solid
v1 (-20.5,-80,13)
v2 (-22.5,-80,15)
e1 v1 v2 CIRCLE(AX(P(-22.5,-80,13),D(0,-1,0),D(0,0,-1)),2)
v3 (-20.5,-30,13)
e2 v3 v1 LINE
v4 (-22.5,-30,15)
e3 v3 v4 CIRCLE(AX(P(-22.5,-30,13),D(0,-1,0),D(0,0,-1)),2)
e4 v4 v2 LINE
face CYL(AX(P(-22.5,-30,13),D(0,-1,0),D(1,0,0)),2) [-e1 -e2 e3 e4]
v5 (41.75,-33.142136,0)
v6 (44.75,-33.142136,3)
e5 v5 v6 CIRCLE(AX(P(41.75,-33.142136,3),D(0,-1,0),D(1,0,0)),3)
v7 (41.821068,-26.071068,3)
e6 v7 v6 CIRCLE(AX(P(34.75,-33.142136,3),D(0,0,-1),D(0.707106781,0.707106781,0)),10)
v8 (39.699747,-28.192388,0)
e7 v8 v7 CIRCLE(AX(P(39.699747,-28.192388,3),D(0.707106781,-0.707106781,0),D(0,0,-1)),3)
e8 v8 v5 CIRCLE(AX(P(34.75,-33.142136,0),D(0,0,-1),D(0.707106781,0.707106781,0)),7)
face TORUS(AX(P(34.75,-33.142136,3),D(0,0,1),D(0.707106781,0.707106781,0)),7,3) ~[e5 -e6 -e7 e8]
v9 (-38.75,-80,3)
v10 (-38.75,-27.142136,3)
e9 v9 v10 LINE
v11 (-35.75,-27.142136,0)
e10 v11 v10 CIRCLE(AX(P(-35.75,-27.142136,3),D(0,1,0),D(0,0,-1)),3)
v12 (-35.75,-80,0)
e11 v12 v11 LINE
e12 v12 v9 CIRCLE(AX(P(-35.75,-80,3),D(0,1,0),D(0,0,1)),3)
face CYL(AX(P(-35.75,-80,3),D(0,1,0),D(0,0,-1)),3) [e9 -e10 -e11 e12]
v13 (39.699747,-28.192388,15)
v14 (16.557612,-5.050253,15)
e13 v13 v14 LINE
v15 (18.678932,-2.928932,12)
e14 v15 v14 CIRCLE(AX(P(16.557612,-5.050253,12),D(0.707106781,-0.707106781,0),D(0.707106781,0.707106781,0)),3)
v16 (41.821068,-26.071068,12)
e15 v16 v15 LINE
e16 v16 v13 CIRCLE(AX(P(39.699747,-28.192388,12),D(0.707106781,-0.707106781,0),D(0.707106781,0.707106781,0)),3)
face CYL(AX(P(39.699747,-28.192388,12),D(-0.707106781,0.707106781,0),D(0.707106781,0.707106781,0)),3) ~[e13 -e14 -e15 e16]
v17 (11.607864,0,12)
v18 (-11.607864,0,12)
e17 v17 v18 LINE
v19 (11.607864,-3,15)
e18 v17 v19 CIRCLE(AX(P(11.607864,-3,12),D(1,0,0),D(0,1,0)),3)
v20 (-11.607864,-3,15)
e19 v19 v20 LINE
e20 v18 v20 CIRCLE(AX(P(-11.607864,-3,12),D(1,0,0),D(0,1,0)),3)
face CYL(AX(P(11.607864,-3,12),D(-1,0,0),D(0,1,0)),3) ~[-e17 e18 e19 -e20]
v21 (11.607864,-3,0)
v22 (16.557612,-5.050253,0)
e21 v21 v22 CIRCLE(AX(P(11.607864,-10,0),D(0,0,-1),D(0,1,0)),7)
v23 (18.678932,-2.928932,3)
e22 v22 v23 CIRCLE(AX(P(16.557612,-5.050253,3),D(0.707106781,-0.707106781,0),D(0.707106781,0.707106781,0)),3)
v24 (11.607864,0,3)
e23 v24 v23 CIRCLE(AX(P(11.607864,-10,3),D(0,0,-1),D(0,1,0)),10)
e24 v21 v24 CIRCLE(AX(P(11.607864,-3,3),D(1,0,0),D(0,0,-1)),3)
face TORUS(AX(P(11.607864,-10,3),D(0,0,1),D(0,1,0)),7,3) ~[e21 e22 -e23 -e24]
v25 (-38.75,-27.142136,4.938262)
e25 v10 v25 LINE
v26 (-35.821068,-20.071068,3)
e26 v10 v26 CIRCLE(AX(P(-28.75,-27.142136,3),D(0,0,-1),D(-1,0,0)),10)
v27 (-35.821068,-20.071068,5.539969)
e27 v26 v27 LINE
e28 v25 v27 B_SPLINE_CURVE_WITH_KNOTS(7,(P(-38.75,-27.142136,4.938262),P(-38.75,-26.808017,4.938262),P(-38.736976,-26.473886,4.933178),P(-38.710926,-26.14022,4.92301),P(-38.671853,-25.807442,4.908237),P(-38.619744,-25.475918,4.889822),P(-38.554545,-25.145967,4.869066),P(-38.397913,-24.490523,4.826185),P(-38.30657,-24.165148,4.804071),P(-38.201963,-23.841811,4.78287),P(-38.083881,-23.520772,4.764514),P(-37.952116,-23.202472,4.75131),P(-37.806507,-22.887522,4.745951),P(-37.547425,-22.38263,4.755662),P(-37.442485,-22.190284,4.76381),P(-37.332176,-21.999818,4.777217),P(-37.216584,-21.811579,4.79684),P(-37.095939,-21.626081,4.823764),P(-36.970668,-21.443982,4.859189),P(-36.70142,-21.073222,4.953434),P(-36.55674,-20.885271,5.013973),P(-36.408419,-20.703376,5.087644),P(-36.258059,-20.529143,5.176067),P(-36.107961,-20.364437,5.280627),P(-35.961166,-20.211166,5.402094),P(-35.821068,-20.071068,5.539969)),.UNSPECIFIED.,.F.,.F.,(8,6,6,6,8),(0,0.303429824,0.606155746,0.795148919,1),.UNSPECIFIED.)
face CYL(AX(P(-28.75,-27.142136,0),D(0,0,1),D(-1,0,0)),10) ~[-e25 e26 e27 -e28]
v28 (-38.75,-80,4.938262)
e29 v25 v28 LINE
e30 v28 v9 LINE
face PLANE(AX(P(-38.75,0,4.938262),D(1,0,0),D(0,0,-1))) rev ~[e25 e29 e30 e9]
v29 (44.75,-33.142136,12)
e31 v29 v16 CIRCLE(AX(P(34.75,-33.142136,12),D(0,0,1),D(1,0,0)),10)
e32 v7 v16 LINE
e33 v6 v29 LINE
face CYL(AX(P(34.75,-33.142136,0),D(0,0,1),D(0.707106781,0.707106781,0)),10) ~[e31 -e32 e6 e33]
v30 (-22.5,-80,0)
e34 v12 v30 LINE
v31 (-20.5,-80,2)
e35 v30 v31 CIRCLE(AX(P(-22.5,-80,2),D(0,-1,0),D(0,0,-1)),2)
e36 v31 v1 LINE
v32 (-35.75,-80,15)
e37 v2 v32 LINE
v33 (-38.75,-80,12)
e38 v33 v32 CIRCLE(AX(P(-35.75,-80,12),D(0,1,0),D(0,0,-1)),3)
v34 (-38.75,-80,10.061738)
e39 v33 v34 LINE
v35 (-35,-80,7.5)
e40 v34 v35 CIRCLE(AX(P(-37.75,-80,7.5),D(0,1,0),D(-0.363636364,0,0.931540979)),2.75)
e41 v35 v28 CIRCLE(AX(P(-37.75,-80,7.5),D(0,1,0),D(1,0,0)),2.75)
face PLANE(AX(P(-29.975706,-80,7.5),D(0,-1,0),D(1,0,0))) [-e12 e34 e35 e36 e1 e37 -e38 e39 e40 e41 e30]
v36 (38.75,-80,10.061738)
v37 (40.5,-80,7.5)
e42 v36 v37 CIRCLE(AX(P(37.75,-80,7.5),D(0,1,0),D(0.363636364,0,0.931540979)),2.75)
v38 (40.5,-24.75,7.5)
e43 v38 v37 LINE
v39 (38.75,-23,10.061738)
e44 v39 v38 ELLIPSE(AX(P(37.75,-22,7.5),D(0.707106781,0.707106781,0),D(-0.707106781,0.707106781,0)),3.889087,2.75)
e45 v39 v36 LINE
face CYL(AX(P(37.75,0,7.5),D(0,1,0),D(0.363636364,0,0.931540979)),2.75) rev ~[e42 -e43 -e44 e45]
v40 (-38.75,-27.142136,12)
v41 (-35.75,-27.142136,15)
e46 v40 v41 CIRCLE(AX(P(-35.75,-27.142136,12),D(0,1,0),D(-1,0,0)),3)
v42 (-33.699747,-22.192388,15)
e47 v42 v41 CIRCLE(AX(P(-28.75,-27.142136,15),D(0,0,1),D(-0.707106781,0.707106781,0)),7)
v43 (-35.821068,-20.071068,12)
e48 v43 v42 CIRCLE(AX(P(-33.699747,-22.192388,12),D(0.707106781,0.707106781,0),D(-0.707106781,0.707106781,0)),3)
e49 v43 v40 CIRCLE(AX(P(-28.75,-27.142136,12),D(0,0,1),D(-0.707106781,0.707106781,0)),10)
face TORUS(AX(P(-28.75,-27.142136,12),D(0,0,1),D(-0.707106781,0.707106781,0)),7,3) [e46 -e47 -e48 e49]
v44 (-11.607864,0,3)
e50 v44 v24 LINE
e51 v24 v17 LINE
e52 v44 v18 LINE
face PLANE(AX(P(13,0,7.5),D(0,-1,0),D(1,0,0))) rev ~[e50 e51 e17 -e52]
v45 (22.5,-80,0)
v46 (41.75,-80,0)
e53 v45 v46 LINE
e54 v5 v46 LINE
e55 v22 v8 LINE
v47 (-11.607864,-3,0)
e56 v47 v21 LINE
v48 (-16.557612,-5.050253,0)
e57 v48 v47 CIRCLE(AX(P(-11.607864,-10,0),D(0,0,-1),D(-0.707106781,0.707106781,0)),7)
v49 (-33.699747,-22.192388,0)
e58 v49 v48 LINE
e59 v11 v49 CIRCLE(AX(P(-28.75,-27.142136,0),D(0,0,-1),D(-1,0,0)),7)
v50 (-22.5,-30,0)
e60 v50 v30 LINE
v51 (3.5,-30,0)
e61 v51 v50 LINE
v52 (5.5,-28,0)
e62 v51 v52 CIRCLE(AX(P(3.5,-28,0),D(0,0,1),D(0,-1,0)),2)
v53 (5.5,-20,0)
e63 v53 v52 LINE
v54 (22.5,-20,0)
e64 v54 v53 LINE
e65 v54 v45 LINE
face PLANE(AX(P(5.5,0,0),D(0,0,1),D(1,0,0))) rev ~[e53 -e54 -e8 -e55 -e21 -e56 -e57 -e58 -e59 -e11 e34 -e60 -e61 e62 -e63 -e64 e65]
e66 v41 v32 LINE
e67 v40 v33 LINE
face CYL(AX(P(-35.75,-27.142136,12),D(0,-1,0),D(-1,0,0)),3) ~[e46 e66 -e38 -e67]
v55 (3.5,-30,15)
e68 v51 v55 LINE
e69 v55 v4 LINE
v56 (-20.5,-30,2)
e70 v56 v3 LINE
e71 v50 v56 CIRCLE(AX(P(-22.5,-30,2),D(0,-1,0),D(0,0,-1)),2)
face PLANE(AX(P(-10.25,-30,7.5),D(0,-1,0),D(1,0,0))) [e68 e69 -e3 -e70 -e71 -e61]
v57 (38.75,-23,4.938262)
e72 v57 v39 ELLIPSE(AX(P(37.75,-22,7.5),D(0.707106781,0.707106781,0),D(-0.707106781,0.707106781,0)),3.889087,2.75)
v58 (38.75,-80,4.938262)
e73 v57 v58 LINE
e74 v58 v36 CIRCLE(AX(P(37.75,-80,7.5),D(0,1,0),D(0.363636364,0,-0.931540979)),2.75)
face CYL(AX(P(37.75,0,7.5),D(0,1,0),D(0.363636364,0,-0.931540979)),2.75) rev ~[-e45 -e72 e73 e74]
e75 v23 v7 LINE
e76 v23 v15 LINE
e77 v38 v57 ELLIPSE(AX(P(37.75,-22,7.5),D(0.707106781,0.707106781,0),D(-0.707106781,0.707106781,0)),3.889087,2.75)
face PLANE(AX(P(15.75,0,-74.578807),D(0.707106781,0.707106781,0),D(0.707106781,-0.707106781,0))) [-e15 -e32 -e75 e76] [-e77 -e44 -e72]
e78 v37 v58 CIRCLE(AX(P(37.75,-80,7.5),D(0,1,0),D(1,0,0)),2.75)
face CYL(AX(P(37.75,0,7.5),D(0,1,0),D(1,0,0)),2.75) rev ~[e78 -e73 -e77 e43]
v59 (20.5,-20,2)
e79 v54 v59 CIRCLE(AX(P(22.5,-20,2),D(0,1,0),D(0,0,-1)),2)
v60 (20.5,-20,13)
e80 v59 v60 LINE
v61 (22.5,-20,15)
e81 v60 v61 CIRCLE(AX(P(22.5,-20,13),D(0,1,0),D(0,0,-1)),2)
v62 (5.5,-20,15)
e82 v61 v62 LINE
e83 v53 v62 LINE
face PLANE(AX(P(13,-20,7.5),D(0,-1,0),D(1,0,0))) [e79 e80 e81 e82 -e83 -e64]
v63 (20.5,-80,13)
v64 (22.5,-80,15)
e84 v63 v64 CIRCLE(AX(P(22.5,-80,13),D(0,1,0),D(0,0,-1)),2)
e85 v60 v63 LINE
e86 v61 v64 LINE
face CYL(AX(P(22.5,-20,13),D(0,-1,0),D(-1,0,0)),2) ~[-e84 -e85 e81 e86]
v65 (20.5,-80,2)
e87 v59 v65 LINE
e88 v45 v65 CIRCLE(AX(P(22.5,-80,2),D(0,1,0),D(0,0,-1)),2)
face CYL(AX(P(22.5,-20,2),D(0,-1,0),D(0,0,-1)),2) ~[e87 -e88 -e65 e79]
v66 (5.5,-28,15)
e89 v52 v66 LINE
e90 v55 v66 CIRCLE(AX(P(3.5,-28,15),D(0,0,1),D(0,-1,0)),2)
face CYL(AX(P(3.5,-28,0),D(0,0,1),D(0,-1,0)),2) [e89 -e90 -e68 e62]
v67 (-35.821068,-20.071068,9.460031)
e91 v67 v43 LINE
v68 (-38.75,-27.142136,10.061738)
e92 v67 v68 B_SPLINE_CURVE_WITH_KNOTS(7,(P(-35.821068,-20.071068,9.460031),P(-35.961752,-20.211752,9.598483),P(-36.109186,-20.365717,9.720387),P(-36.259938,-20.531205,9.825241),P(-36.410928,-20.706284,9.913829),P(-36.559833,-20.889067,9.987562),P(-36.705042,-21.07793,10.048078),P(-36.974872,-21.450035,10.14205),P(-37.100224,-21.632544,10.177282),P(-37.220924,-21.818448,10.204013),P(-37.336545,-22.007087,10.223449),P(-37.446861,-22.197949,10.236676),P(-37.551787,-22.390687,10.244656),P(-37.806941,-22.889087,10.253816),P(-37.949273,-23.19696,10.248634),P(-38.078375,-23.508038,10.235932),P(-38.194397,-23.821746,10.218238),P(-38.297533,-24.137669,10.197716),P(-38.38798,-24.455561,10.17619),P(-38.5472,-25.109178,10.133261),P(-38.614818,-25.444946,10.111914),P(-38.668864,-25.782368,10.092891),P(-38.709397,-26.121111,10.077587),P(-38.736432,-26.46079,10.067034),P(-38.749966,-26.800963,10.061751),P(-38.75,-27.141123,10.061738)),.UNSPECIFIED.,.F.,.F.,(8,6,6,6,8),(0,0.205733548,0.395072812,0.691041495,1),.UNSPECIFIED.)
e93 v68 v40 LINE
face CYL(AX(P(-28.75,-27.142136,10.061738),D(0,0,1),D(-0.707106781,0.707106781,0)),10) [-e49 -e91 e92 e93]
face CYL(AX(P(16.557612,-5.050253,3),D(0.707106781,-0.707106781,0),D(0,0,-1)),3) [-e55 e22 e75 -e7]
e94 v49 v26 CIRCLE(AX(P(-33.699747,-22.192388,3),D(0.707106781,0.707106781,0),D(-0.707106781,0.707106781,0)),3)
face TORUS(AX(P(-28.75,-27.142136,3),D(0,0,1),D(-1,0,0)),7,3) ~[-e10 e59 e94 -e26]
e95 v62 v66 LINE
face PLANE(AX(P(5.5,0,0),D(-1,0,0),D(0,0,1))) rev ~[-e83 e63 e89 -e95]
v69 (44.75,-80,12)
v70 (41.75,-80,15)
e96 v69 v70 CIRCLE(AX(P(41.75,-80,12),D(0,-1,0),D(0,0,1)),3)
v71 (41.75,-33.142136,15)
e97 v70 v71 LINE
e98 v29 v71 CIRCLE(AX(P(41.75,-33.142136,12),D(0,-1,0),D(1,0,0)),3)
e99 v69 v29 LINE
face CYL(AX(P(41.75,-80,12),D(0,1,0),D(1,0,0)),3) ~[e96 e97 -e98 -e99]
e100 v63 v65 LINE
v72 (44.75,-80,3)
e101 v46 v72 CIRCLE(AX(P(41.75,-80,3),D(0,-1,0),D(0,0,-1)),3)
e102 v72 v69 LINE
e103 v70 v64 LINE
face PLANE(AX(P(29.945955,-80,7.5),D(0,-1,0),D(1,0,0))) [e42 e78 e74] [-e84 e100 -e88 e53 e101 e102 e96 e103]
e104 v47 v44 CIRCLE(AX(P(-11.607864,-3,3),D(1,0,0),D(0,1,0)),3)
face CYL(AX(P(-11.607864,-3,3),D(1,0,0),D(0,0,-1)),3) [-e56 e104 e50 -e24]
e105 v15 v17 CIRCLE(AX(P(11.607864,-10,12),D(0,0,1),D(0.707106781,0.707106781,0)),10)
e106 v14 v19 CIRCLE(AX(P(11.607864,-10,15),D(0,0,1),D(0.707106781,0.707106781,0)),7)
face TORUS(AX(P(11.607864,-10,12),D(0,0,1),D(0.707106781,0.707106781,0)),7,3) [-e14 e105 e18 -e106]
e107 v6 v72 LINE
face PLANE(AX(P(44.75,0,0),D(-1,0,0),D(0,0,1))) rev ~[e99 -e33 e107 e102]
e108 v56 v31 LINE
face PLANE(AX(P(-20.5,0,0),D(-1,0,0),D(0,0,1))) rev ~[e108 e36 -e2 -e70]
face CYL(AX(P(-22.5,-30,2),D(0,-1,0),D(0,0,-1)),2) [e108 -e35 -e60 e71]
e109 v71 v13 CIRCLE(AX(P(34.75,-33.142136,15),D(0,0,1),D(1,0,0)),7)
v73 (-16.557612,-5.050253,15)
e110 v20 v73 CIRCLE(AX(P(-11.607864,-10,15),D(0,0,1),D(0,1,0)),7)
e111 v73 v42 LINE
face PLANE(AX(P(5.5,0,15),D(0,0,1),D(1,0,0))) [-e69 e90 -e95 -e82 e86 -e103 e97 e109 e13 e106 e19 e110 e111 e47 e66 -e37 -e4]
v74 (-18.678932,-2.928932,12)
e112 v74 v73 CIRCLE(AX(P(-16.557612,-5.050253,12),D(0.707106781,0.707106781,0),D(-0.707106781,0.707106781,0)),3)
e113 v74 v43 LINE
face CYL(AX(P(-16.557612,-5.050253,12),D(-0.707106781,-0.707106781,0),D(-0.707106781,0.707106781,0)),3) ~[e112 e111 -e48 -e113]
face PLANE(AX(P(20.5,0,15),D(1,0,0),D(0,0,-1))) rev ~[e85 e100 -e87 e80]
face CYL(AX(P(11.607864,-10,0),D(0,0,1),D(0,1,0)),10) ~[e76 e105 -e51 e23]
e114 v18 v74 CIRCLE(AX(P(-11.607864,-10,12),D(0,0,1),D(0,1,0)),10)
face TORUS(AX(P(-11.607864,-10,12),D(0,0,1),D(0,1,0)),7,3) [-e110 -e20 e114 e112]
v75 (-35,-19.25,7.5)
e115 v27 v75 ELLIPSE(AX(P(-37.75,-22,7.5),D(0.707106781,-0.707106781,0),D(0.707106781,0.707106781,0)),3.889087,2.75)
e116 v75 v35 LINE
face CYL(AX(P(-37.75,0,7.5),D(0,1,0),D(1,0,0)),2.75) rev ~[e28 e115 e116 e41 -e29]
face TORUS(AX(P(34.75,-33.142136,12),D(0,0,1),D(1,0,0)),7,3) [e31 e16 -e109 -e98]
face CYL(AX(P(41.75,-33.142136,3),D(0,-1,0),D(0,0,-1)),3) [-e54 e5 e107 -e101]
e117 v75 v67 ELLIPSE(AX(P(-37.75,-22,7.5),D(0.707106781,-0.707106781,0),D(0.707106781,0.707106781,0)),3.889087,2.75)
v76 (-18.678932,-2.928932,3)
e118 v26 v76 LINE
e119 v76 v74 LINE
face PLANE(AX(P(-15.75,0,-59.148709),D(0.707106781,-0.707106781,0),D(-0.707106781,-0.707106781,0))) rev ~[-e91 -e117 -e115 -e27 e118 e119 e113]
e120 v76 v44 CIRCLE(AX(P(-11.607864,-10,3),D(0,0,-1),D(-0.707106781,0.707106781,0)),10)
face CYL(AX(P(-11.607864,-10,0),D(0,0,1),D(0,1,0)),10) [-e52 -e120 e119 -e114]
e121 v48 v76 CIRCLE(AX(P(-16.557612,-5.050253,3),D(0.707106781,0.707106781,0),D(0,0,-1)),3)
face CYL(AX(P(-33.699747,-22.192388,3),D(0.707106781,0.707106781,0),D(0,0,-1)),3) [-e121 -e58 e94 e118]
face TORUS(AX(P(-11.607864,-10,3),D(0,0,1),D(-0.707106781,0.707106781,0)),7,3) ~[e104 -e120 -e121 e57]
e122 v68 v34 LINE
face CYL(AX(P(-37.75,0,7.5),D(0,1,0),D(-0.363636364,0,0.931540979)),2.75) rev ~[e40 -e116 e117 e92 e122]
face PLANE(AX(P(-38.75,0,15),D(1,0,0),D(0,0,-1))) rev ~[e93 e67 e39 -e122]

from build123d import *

# Parameters (mm, degrees)
F1_DEPTH    = 80
F0_W        = 20.5
F0_H        = 15
F0_W_2      = 5.5
F2_DEPTH    = 30
F0_W_3      = 15
F3_DEPTH    = 20
F4_T1_DEPTH = 123.2356797549
F4_T3_DEPTH = 123.2356797549
F5_T1_DEPTH = 164.157613302
F6_R        = 10
F7_R        = 2
F8_R        = 3


# Not quite as in the source:
# - a fillet or chamfer that OpenCascade refuses, or shapes differently, is made with other operations: its cross-section is extruded or revolved along the edge and cut away or added


with BuildPart() as f1:
    # F0 (on Front) → F1 (new body)
    with BuildSketch(Plane.XZ):
        with BuildLine():
            Line((-20.5, 15), (-38.75, 15))
            Line((-38.75, 15), (-38.75, 10.0617376915))
            ThreePointArc((-38.75, 10.0617376915), (-36.1987907943, 9.7707377656), (-35, 7.5))
            ThreePointArc((-35, 7.5), (-36.1987907943, 5.2292622344), (-38.75, 4.9382623085))
            Line((-38.75, 4.9382623085), (-38.75, 0))
            Line((-38.75, 0), (-20.5, 0))
            Line((-20.5, 0), (-20.5, 15))
        make_face()
    extrude(amount=F1_DEPTH)

    # F0 (on Front) → F2 (join)
    with BuildSketch(Plane.XZ):
        with Locations((-10.25, 7.5)):
            Rectangle(F0_W, F0_H)
        with Locations((2.75, 7.5)):
            Rectangle(F0_W_2, F0_H)
    extrude(amount=F2_DEPTH)



with BuildPart() as f1b:
    # F0 (on Front) → F1, piece 2 (new body)
    with BuildSketch(Plane.XZ):
        with BuildLine():
            Line((38.75, 15), (20.5, 15))
            Line((20.5, 15), (20.5, 0))
            Line((20.5, 0), (38.75, 0))
            Line((38.75, 0), (38.75, 4.9382623085))
            ThreePointArc((38.75, 4.9382623085), (35, 7.5), (38.75, 10.0617376915))
            Line((38.75, 10.0617376915), (38.75, 15))
        make_face()
        with BuildLine():
            Line((44.75, 15), (38.75, 15))
            Line((38.75, 15), (38.75, 10.0617376915))
            ThreePointArc((38.75, 10.0617376915), (40.0207377656, 9.0512092057), (40.5, 7.5))
            ThreePointArc((40.5, 7.5), (40.0207377656, 5.9487907943), (38.75, 4.9382623085))
            Line((38.75, 4.9382623085), (38.75, 0))
            Line((38.75, 0), (44.75, 0))
            Line((44.75, 0), (44.75, 15))
        make_face()
    extrude(amount=F1_DEPTH)


with BuildPart() as f1_1:
    add(f1.part)

    add(f1b.part)  # F3 merges F1b
    # F0 (on Front) → F3 (join)
    with BuildSketch(Plane.XZ):
        with Locations((13, 7.5)):
            Rectangle(F0_W_3, F0_H)
    extrude(amount=F3_DEPTH)

    # F4: chamfer of 23 on 2 edges, made by hand

    # F4_s2 → F4_t1 (cut)
    with BuildSketch(Plane.XY.offset(-59.1487087232)):
        Polygon((-15.75, 0), (-38.75, -23), (-38.75, 0), align=None)
    extrude(amount=F4_T1_DEPTH, mode=Mode.SUBTRACT)

    # F4_s4 → F4_t3 (cut)
    with BuildSketch(Plane.XY.offset(-49.0869710317)):
        Polygon((-15.75, 0), (-38.75, -23), (-38.75, 0), align=None)
    extrude(amount=F4_T3_DEPTH, mode=Mode.SUBTRACT)

    # F5: chamfer of 29 on 1 edges, made by hand

    # F5_s2 → F5_t1 (cut)
    with BuildSketch(Plane.XY.offset(-74.578806651)):
        Polygon((15.75, 0), (44.75, -29), (44.75, 0), align=None)
    extrude(amount=F5_T1_DEPTH, mode=Mode.SUBTRACT)

    # F6
    f6_edges = [f1_1.edges().sort_by_distance(p)[0] for p in [
        (15.75, 0, 7.5),
        (-15.75, 0, 7.5),
        (44.75, -29, 7.5),
        (-38.75, -23, 2.469131),
        (-38.75, -23, 12.530869),
    ]]
    fillet(f6_edges, radius=F6_R)

    # F7
    f7_edges = [f1_1.edges().sort_by_distance(p)[0] for p in [
        (20.5, -50, 15),
        (20.5, -50, 0),
        (-20.5, -55, 15),
        (-20.5, -55, 0),
        (5.5, -30, 7.5),
    ]]
    fillet(f7_edges, radius=F7_R)

    # F8
    f8_edges = [f1_1.edges().sort_by_distance(p)[0] for p in [
        (-38.75, -53.571068, 15),
        (-37.988795, -23.315301, 15),
        (-27.25, -11.5, 15),
        (-15.434699, -0.761205, 15),
        (0, 0, 15),
        (15.434699, -0.761205, 15),
        (30.25, -14.5, 15),
        (43.988795, -29.315301, 15),
        (44.75, -56.571068, 15),
        (44.75, -56.571068, 0),
        (43.988795, -29.315301, 0),
        (-38.75, -53.571068, 0),
        (-37.988795, -23.315301, 0),
        (-27.25, -11.5, 0),
        (-15.434699, -0.761205, 0),
        (0, 0, 0),
        (15.434699, -0.761205, 0),
        (30.25, -14.5, 0),
    ]]
    fillet(f8_edges, radius=F8_R)


solid = f1_1.part
